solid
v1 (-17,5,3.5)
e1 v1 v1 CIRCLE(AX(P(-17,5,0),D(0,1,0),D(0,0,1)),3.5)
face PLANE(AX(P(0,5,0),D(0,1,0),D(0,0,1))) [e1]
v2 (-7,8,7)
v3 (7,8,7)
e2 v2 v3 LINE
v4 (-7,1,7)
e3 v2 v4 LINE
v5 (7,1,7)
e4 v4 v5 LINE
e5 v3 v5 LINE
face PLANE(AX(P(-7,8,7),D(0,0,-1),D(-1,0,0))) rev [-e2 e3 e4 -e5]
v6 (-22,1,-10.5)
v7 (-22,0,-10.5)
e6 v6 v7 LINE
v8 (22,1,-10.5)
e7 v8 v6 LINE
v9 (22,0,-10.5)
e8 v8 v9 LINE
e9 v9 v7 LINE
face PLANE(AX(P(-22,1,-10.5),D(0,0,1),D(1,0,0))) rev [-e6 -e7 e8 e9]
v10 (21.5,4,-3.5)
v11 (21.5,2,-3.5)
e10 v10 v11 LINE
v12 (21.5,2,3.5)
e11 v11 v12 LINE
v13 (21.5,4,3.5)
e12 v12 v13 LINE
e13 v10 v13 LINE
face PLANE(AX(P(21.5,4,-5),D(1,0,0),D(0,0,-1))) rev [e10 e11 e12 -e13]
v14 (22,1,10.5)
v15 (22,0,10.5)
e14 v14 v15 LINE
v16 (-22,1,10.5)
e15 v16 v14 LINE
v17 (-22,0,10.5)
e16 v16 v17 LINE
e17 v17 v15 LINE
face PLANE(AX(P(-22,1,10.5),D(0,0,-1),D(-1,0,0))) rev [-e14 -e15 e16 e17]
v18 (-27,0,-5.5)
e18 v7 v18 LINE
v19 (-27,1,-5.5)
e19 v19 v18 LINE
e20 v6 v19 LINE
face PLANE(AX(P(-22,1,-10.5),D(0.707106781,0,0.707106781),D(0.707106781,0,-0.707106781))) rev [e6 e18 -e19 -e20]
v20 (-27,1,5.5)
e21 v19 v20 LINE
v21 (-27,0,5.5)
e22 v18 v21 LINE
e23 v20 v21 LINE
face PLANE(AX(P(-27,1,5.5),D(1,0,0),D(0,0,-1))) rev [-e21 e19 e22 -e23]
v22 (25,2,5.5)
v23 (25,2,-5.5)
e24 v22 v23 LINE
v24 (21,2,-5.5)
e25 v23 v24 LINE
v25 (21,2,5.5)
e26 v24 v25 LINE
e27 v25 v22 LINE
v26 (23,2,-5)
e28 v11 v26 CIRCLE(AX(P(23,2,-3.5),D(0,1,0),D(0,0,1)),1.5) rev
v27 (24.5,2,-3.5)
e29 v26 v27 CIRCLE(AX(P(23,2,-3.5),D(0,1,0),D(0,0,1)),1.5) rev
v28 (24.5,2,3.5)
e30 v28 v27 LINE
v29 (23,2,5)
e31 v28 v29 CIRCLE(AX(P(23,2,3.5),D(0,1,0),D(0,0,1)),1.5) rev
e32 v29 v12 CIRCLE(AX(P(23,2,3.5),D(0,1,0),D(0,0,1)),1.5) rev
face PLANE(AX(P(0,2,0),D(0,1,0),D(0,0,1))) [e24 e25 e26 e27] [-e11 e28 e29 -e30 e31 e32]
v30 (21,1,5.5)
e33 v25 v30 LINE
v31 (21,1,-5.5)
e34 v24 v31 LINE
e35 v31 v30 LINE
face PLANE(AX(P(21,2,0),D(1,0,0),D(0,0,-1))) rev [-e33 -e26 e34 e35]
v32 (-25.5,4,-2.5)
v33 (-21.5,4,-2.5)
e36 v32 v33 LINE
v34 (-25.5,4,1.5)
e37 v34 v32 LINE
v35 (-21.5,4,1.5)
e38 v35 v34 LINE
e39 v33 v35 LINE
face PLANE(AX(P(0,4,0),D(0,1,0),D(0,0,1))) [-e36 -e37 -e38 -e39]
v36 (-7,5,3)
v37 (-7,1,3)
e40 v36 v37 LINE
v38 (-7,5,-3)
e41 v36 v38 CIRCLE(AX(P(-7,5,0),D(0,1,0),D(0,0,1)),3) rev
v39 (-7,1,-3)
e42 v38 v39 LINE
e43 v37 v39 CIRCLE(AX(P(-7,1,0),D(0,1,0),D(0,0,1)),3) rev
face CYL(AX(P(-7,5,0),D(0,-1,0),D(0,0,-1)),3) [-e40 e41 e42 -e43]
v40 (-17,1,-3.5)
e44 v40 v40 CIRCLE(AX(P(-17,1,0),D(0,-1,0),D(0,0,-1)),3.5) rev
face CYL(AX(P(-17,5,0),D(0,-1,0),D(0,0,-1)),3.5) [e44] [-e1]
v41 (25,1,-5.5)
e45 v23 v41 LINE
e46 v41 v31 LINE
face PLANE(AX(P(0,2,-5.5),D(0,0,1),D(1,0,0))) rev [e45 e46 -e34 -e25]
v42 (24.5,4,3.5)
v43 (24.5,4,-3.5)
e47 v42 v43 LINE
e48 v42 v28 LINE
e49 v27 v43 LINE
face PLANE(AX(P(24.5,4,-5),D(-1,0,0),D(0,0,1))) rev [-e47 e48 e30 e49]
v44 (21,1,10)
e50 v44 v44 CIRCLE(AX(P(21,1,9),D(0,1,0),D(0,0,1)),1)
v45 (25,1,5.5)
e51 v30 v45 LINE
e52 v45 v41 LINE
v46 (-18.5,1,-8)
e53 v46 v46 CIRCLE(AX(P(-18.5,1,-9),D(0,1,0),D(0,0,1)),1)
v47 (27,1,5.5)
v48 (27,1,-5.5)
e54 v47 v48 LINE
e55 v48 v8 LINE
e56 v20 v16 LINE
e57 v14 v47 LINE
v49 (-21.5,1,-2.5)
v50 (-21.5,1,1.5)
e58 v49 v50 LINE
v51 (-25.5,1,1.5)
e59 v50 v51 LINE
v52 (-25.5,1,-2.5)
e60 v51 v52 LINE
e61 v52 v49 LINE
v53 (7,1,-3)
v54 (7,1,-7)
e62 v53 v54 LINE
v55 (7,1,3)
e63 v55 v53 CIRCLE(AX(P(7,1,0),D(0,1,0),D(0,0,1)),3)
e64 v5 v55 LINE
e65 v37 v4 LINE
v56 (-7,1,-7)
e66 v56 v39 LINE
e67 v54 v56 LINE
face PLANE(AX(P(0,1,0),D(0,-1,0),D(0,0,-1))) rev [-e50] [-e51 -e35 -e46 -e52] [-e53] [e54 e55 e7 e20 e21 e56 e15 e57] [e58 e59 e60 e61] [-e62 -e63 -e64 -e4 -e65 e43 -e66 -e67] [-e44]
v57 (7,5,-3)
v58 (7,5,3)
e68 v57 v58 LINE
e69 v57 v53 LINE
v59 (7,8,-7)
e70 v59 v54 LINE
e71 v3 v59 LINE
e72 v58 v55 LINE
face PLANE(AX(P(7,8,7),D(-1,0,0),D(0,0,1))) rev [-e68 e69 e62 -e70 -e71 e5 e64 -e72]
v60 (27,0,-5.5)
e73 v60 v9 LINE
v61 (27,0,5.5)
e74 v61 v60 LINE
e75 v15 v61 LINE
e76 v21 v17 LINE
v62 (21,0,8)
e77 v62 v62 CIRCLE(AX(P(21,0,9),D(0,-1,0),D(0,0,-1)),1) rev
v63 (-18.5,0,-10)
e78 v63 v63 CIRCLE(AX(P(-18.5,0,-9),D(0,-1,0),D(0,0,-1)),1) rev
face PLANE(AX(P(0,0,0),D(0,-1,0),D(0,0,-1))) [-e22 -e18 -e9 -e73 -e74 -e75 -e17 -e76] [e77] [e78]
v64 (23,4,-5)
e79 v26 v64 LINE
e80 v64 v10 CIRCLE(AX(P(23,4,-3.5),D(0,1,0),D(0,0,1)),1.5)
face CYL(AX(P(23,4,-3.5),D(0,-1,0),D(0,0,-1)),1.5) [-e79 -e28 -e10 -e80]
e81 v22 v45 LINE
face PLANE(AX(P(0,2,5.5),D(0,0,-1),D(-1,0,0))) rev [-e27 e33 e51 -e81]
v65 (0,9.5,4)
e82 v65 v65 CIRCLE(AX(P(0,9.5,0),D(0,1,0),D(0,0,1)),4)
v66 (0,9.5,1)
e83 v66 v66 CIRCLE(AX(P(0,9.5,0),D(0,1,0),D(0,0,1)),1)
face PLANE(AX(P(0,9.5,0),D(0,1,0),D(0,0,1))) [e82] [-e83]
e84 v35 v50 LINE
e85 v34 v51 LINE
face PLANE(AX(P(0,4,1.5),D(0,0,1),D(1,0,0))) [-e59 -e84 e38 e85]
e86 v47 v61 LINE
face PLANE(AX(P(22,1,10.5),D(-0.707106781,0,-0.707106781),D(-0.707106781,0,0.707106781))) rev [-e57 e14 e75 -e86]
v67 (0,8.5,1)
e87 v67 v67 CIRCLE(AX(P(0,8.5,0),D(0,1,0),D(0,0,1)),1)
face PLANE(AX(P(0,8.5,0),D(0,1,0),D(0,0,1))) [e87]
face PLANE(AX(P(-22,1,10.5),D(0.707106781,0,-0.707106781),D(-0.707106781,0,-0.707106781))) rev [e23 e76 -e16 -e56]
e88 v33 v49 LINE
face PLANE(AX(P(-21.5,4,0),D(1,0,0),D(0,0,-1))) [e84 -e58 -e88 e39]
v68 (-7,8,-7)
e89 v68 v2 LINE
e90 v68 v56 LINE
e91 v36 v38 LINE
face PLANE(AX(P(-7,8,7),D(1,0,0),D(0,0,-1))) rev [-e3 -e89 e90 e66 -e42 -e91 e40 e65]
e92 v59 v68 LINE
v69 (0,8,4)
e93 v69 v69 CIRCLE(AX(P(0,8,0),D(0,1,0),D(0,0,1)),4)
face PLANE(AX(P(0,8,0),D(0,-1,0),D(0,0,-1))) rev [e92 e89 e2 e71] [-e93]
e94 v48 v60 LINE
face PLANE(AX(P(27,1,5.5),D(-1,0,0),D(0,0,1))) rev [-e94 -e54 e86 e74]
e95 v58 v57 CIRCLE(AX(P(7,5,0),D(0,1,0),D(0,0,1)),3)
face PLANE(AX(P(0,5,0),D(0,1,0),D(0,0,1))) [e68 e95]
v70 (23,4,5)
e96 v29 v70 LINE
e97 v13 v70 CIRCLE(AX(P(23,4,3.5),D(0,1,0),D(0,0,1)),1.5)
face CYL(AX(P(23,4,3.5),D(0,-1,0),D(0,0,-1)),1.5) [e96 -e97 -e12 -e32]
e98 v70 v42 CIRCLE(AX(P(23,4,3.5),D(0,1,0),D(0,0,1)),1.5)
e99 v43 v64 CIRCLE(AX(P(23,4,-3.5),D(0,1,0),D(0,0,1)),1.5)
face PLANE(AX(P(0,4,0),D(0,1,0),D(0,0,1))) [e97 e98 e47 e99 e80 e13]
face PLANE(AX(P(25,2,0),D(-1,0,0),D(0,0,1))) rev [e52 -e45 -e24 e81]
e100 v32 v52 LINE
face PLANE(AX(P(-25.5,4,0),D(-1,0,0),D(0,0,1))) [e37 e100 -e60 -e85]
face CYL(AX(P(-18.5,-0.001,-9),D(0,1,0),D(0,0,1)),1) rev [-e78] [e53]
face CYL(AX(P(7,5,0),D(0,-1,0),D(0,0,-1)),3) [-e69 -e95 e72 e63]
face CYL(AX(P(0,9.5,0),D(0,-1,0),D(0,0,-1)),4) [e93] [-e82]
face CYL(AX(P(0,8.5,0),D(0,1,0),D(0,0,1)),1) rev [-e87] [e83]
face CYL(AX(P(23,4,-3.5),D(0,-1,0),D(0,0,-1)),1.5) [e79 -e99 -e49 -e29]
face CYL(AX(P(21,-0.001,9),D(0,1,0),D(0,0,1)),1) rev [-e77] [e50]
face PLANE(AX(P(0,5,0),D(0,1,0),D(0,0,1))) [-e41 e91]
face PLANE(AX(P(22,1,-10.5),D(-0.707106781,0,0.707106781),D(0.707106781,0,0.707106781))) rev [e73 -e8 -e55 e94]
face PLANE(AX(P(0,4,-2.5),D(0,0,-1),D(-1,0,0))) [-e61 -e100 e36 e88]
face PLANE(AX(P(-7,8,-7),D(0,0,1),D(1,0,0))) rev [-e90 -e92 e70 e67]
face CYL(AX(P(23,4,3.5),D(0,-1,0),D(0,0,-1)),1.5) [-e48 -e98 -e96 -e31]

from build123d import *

# Parameters (mm, degrees)
BOSS_EXTRUDE1_DEPTH = 1
SKETCH2_W           = 14
SKETCH2_H           = 14
BOSS_EXTRUDE2_DEPTH = 7
SKETCH3_R           = 4
BOSS_EXTRUDE3_DEPTH = 1.5
BOSS_EXTRUDE4_DEPTH = 4
SKETCH6_R           = 1
CUT_EXTRUDE1_DEPTH  = 1
CUT_EXTRUDE2_REACH  = 32.191
SKETCH7_R           = 1
SKETCH8_R           = 3.5
BOSS_EXTRUDE5_DEPTH = 4
SKETCH9_W           = 4
SKETCH9_H           = 4
BOSS_EXTRUDE6_DEPTH = 3
SKETCH11_W          = 4
SKETCH11_H          = 11
BOSS_EXTRUDE7_DEPTH = 1
SKETCH12_W          = 3
SKETCH12_H          = 10
BOSS_EXTRUDE8_DEPTH = 2
FILLET1_R           = 1.5


with BuildPart() as part:
    # Sketch1 → Boss-Extrude1 (new body)
    with BuildSketch(Plane(origin=(0, 0, 0), x_dir=(1, 0, 0), z_dir=(0, 1, 0))):
        Polygon((-22, -10.5), (22, -10.5), (27, -5.5), (27, 5.5), (22, 10.5), (-22, 10.5), (-27, 5.5), (-27, -5.5), align=None)
    extrude(amount=BOSS_EXTRUDE1_DEPTH)

    # Sketch2 → Boss-Extrude2 (add)
    with BuildSketch(Plane(origin=(0, 1, 0), x_dir=(1, 0, 0), z_dir=(0, 1, 0))):
        Rectangle(SKETCH2_W, SKETCH2_H)
    extrude(amount=BOSS_EXTRUDE2_DEPTH)

    # Sketch3 → Boss-Extrude3 (add)
    with BuildSketch(Plane(origin=(0, 8, 0), x_dir=(1, 0, 0), z_dir=(0, 1, 0))):
        with Locations(Location((0, 0, 0), (0, 0, 270))):
            Circle(SKETCH3_R)
    extrude(amount=BOSS_EXTRUDE3_DEPTH)

    # Sketch4 → Boss-Extrude4 (add)
    with BuildSketch(Plane(origin=(0, 1, 0), x_dir=(1, 0, 0), z_dir=(0, 1, 0))):
        with BuildLine():
            ThreePointArc((7, -3), (9.121320344, -2.121320344), (10, 0))
            ThreePointArc((10, 0), (9.121320344, 2.121320344), (7, 3))
            Line((7, 3), (7, -3))
        make_face()
        with BuildLine():
            Line((7, -3), (7, 3))
            ThreePointArc((7, 3), (4, 0), (7, -3))
        make_face()
        with BuildLine():
            ThreePointArc((-7, -3), (-4.878679656, -2.121320344), (-4, 0))
            ThreePointArc((-4, 0), (-4.878679656, 2.121320344), (-7, 3))
            Line((-7, 3), (-7, -3))
        make_face()
        with BuildLine():
            Line((-7, -3), (-7, 3))
            ThreePointArc((-7, 3), (-10, 0), (-7, -3))
        make_face()
    extrude(amount=BOSS_EXTRUDE4_DEPTH)

    # Sketch6 → Cut-Extrude1 (cut)
    with BuildSketch(Plane(origin=(0, 9.5, 0), x_dir=(1, 0, 0), z_dir=(0, 1, 0))):
        with Locations(Location((0, 0, 0), (0, 0, 270))):
            Circle(SKETCH6_R)
    extrude(amount=-CUT_EXTRUDE1_DEPTH, mode=Mode.SUBTRACT)

    # Sketch7 → Cut-Extrude2 (cut, up to next)
    with BuildSketch(Plane(origin=(0, 1, 0), x_dir=(1, 0, 0), z_dir=(0, 1, 0)), mode=Mode.PRIVATE) as cut_extrude2_sk1:
        with Locations(Location((-18.5, 9, 0), (0, 0, 270))):
            Circle(SKETCH7_R)
    cut_extrude2_tool1 = extrude(cut_extrude2_sk1.sketch, amount=-CUT_EXTRUDE2_REACH, mode=Mode.PRIVATE) & part.part
    # Sketch7 → Cut-Extrude2 (cut, up to next)
    with BuildSketch(Plane(origin=(0, 1, 0), x_dir=(1, 0, 0), z_dir=(0, 1, 0)), mode=Mode.PRIVATE) as cut_extrude2_sk2:
        with Locations(Location((21, -9, 0), (0, 0, 270))):
            Circle(SKETCH7_R)
    cut_extrude2_tool2 = extrude(cut_extrude2_sk2.sketch, amount=-CUT_EXTRUDE2_REACH, mode=Mode.PRIVATE) & part.part
    add(cut_extrude2_tool1.solids().sort_by_distance((-18.5, 1, -9))[0], mode=Mode.SUBTRACT)
    add(cut_extrude2_tool2.solids().sort_by_distance((21, 1, 9))[0], mode=Mode.SUBTRACT)

    # Sketch8 → Boss-Extrude5 (add)
    with BuildSketch(Plane(origin=(0, 1, 0), x_dir=(1, 0, 0), z_dir=(0, 1, 0))):
        with Locations(Location((-17, 0, 0), (0, 0, 90))):
            Circle(SKETCH8_R)
    extrude(amount=BOSS_EXTRUDE5_DEPTH)

    # Sketch9 → Boss-Extrude6 (add)
    with BuildSketch(Plane(origin=(0, 1, 0), x_dir=(1, 0, 0), z_dir=(0, 1, 0))):
        with Locations((-23.5, 0.5)):
            Rectangle(SKETCH9_W, SKETCH9_H)
    extrude(amount=BOSS_EXTRUDE6_DEPTH)

    # Sketch11 → Boss-Extrude7 (add)
    with BuildSketch(Plane(origin=(0, 1, 0), x_dir=(1, 0, 0), z_dir=(0, 1, 0))):
        with Locations((23, 0)):
            Rectangle(SKETCH11_W, SKETCH11_H)
    extrude(amount=BOSS_EXTRUDE7_DEPTH)

    # Sketch12 → Boss-Extrude8 (add)
    with BuildSketch(Plane(origin=(0, 2, 0), x_dir=(1, 0, 0), z_dir=(0, 1, 0))):
        with Locations((23, 0)):
            Rectangle(SKETCH12_W, SKETCH12_H)
    extrude(amount=BOSS_EXTRUDE8_DEPTH)

    # Fillet1
    fillet1_edges = [part.edges().sort_by_distance(p)[0] for p in [
        (24.5, 3, -5),
        (21.5, 3, -5),
        (21.5, 3, 5),
        (24.5, 3, 5),
    ]]
    fillet(fillet1_edges, radius=FILLET1_R - 0.0001)  # a hair under: the kernel refuses the full size


solid = part.part
